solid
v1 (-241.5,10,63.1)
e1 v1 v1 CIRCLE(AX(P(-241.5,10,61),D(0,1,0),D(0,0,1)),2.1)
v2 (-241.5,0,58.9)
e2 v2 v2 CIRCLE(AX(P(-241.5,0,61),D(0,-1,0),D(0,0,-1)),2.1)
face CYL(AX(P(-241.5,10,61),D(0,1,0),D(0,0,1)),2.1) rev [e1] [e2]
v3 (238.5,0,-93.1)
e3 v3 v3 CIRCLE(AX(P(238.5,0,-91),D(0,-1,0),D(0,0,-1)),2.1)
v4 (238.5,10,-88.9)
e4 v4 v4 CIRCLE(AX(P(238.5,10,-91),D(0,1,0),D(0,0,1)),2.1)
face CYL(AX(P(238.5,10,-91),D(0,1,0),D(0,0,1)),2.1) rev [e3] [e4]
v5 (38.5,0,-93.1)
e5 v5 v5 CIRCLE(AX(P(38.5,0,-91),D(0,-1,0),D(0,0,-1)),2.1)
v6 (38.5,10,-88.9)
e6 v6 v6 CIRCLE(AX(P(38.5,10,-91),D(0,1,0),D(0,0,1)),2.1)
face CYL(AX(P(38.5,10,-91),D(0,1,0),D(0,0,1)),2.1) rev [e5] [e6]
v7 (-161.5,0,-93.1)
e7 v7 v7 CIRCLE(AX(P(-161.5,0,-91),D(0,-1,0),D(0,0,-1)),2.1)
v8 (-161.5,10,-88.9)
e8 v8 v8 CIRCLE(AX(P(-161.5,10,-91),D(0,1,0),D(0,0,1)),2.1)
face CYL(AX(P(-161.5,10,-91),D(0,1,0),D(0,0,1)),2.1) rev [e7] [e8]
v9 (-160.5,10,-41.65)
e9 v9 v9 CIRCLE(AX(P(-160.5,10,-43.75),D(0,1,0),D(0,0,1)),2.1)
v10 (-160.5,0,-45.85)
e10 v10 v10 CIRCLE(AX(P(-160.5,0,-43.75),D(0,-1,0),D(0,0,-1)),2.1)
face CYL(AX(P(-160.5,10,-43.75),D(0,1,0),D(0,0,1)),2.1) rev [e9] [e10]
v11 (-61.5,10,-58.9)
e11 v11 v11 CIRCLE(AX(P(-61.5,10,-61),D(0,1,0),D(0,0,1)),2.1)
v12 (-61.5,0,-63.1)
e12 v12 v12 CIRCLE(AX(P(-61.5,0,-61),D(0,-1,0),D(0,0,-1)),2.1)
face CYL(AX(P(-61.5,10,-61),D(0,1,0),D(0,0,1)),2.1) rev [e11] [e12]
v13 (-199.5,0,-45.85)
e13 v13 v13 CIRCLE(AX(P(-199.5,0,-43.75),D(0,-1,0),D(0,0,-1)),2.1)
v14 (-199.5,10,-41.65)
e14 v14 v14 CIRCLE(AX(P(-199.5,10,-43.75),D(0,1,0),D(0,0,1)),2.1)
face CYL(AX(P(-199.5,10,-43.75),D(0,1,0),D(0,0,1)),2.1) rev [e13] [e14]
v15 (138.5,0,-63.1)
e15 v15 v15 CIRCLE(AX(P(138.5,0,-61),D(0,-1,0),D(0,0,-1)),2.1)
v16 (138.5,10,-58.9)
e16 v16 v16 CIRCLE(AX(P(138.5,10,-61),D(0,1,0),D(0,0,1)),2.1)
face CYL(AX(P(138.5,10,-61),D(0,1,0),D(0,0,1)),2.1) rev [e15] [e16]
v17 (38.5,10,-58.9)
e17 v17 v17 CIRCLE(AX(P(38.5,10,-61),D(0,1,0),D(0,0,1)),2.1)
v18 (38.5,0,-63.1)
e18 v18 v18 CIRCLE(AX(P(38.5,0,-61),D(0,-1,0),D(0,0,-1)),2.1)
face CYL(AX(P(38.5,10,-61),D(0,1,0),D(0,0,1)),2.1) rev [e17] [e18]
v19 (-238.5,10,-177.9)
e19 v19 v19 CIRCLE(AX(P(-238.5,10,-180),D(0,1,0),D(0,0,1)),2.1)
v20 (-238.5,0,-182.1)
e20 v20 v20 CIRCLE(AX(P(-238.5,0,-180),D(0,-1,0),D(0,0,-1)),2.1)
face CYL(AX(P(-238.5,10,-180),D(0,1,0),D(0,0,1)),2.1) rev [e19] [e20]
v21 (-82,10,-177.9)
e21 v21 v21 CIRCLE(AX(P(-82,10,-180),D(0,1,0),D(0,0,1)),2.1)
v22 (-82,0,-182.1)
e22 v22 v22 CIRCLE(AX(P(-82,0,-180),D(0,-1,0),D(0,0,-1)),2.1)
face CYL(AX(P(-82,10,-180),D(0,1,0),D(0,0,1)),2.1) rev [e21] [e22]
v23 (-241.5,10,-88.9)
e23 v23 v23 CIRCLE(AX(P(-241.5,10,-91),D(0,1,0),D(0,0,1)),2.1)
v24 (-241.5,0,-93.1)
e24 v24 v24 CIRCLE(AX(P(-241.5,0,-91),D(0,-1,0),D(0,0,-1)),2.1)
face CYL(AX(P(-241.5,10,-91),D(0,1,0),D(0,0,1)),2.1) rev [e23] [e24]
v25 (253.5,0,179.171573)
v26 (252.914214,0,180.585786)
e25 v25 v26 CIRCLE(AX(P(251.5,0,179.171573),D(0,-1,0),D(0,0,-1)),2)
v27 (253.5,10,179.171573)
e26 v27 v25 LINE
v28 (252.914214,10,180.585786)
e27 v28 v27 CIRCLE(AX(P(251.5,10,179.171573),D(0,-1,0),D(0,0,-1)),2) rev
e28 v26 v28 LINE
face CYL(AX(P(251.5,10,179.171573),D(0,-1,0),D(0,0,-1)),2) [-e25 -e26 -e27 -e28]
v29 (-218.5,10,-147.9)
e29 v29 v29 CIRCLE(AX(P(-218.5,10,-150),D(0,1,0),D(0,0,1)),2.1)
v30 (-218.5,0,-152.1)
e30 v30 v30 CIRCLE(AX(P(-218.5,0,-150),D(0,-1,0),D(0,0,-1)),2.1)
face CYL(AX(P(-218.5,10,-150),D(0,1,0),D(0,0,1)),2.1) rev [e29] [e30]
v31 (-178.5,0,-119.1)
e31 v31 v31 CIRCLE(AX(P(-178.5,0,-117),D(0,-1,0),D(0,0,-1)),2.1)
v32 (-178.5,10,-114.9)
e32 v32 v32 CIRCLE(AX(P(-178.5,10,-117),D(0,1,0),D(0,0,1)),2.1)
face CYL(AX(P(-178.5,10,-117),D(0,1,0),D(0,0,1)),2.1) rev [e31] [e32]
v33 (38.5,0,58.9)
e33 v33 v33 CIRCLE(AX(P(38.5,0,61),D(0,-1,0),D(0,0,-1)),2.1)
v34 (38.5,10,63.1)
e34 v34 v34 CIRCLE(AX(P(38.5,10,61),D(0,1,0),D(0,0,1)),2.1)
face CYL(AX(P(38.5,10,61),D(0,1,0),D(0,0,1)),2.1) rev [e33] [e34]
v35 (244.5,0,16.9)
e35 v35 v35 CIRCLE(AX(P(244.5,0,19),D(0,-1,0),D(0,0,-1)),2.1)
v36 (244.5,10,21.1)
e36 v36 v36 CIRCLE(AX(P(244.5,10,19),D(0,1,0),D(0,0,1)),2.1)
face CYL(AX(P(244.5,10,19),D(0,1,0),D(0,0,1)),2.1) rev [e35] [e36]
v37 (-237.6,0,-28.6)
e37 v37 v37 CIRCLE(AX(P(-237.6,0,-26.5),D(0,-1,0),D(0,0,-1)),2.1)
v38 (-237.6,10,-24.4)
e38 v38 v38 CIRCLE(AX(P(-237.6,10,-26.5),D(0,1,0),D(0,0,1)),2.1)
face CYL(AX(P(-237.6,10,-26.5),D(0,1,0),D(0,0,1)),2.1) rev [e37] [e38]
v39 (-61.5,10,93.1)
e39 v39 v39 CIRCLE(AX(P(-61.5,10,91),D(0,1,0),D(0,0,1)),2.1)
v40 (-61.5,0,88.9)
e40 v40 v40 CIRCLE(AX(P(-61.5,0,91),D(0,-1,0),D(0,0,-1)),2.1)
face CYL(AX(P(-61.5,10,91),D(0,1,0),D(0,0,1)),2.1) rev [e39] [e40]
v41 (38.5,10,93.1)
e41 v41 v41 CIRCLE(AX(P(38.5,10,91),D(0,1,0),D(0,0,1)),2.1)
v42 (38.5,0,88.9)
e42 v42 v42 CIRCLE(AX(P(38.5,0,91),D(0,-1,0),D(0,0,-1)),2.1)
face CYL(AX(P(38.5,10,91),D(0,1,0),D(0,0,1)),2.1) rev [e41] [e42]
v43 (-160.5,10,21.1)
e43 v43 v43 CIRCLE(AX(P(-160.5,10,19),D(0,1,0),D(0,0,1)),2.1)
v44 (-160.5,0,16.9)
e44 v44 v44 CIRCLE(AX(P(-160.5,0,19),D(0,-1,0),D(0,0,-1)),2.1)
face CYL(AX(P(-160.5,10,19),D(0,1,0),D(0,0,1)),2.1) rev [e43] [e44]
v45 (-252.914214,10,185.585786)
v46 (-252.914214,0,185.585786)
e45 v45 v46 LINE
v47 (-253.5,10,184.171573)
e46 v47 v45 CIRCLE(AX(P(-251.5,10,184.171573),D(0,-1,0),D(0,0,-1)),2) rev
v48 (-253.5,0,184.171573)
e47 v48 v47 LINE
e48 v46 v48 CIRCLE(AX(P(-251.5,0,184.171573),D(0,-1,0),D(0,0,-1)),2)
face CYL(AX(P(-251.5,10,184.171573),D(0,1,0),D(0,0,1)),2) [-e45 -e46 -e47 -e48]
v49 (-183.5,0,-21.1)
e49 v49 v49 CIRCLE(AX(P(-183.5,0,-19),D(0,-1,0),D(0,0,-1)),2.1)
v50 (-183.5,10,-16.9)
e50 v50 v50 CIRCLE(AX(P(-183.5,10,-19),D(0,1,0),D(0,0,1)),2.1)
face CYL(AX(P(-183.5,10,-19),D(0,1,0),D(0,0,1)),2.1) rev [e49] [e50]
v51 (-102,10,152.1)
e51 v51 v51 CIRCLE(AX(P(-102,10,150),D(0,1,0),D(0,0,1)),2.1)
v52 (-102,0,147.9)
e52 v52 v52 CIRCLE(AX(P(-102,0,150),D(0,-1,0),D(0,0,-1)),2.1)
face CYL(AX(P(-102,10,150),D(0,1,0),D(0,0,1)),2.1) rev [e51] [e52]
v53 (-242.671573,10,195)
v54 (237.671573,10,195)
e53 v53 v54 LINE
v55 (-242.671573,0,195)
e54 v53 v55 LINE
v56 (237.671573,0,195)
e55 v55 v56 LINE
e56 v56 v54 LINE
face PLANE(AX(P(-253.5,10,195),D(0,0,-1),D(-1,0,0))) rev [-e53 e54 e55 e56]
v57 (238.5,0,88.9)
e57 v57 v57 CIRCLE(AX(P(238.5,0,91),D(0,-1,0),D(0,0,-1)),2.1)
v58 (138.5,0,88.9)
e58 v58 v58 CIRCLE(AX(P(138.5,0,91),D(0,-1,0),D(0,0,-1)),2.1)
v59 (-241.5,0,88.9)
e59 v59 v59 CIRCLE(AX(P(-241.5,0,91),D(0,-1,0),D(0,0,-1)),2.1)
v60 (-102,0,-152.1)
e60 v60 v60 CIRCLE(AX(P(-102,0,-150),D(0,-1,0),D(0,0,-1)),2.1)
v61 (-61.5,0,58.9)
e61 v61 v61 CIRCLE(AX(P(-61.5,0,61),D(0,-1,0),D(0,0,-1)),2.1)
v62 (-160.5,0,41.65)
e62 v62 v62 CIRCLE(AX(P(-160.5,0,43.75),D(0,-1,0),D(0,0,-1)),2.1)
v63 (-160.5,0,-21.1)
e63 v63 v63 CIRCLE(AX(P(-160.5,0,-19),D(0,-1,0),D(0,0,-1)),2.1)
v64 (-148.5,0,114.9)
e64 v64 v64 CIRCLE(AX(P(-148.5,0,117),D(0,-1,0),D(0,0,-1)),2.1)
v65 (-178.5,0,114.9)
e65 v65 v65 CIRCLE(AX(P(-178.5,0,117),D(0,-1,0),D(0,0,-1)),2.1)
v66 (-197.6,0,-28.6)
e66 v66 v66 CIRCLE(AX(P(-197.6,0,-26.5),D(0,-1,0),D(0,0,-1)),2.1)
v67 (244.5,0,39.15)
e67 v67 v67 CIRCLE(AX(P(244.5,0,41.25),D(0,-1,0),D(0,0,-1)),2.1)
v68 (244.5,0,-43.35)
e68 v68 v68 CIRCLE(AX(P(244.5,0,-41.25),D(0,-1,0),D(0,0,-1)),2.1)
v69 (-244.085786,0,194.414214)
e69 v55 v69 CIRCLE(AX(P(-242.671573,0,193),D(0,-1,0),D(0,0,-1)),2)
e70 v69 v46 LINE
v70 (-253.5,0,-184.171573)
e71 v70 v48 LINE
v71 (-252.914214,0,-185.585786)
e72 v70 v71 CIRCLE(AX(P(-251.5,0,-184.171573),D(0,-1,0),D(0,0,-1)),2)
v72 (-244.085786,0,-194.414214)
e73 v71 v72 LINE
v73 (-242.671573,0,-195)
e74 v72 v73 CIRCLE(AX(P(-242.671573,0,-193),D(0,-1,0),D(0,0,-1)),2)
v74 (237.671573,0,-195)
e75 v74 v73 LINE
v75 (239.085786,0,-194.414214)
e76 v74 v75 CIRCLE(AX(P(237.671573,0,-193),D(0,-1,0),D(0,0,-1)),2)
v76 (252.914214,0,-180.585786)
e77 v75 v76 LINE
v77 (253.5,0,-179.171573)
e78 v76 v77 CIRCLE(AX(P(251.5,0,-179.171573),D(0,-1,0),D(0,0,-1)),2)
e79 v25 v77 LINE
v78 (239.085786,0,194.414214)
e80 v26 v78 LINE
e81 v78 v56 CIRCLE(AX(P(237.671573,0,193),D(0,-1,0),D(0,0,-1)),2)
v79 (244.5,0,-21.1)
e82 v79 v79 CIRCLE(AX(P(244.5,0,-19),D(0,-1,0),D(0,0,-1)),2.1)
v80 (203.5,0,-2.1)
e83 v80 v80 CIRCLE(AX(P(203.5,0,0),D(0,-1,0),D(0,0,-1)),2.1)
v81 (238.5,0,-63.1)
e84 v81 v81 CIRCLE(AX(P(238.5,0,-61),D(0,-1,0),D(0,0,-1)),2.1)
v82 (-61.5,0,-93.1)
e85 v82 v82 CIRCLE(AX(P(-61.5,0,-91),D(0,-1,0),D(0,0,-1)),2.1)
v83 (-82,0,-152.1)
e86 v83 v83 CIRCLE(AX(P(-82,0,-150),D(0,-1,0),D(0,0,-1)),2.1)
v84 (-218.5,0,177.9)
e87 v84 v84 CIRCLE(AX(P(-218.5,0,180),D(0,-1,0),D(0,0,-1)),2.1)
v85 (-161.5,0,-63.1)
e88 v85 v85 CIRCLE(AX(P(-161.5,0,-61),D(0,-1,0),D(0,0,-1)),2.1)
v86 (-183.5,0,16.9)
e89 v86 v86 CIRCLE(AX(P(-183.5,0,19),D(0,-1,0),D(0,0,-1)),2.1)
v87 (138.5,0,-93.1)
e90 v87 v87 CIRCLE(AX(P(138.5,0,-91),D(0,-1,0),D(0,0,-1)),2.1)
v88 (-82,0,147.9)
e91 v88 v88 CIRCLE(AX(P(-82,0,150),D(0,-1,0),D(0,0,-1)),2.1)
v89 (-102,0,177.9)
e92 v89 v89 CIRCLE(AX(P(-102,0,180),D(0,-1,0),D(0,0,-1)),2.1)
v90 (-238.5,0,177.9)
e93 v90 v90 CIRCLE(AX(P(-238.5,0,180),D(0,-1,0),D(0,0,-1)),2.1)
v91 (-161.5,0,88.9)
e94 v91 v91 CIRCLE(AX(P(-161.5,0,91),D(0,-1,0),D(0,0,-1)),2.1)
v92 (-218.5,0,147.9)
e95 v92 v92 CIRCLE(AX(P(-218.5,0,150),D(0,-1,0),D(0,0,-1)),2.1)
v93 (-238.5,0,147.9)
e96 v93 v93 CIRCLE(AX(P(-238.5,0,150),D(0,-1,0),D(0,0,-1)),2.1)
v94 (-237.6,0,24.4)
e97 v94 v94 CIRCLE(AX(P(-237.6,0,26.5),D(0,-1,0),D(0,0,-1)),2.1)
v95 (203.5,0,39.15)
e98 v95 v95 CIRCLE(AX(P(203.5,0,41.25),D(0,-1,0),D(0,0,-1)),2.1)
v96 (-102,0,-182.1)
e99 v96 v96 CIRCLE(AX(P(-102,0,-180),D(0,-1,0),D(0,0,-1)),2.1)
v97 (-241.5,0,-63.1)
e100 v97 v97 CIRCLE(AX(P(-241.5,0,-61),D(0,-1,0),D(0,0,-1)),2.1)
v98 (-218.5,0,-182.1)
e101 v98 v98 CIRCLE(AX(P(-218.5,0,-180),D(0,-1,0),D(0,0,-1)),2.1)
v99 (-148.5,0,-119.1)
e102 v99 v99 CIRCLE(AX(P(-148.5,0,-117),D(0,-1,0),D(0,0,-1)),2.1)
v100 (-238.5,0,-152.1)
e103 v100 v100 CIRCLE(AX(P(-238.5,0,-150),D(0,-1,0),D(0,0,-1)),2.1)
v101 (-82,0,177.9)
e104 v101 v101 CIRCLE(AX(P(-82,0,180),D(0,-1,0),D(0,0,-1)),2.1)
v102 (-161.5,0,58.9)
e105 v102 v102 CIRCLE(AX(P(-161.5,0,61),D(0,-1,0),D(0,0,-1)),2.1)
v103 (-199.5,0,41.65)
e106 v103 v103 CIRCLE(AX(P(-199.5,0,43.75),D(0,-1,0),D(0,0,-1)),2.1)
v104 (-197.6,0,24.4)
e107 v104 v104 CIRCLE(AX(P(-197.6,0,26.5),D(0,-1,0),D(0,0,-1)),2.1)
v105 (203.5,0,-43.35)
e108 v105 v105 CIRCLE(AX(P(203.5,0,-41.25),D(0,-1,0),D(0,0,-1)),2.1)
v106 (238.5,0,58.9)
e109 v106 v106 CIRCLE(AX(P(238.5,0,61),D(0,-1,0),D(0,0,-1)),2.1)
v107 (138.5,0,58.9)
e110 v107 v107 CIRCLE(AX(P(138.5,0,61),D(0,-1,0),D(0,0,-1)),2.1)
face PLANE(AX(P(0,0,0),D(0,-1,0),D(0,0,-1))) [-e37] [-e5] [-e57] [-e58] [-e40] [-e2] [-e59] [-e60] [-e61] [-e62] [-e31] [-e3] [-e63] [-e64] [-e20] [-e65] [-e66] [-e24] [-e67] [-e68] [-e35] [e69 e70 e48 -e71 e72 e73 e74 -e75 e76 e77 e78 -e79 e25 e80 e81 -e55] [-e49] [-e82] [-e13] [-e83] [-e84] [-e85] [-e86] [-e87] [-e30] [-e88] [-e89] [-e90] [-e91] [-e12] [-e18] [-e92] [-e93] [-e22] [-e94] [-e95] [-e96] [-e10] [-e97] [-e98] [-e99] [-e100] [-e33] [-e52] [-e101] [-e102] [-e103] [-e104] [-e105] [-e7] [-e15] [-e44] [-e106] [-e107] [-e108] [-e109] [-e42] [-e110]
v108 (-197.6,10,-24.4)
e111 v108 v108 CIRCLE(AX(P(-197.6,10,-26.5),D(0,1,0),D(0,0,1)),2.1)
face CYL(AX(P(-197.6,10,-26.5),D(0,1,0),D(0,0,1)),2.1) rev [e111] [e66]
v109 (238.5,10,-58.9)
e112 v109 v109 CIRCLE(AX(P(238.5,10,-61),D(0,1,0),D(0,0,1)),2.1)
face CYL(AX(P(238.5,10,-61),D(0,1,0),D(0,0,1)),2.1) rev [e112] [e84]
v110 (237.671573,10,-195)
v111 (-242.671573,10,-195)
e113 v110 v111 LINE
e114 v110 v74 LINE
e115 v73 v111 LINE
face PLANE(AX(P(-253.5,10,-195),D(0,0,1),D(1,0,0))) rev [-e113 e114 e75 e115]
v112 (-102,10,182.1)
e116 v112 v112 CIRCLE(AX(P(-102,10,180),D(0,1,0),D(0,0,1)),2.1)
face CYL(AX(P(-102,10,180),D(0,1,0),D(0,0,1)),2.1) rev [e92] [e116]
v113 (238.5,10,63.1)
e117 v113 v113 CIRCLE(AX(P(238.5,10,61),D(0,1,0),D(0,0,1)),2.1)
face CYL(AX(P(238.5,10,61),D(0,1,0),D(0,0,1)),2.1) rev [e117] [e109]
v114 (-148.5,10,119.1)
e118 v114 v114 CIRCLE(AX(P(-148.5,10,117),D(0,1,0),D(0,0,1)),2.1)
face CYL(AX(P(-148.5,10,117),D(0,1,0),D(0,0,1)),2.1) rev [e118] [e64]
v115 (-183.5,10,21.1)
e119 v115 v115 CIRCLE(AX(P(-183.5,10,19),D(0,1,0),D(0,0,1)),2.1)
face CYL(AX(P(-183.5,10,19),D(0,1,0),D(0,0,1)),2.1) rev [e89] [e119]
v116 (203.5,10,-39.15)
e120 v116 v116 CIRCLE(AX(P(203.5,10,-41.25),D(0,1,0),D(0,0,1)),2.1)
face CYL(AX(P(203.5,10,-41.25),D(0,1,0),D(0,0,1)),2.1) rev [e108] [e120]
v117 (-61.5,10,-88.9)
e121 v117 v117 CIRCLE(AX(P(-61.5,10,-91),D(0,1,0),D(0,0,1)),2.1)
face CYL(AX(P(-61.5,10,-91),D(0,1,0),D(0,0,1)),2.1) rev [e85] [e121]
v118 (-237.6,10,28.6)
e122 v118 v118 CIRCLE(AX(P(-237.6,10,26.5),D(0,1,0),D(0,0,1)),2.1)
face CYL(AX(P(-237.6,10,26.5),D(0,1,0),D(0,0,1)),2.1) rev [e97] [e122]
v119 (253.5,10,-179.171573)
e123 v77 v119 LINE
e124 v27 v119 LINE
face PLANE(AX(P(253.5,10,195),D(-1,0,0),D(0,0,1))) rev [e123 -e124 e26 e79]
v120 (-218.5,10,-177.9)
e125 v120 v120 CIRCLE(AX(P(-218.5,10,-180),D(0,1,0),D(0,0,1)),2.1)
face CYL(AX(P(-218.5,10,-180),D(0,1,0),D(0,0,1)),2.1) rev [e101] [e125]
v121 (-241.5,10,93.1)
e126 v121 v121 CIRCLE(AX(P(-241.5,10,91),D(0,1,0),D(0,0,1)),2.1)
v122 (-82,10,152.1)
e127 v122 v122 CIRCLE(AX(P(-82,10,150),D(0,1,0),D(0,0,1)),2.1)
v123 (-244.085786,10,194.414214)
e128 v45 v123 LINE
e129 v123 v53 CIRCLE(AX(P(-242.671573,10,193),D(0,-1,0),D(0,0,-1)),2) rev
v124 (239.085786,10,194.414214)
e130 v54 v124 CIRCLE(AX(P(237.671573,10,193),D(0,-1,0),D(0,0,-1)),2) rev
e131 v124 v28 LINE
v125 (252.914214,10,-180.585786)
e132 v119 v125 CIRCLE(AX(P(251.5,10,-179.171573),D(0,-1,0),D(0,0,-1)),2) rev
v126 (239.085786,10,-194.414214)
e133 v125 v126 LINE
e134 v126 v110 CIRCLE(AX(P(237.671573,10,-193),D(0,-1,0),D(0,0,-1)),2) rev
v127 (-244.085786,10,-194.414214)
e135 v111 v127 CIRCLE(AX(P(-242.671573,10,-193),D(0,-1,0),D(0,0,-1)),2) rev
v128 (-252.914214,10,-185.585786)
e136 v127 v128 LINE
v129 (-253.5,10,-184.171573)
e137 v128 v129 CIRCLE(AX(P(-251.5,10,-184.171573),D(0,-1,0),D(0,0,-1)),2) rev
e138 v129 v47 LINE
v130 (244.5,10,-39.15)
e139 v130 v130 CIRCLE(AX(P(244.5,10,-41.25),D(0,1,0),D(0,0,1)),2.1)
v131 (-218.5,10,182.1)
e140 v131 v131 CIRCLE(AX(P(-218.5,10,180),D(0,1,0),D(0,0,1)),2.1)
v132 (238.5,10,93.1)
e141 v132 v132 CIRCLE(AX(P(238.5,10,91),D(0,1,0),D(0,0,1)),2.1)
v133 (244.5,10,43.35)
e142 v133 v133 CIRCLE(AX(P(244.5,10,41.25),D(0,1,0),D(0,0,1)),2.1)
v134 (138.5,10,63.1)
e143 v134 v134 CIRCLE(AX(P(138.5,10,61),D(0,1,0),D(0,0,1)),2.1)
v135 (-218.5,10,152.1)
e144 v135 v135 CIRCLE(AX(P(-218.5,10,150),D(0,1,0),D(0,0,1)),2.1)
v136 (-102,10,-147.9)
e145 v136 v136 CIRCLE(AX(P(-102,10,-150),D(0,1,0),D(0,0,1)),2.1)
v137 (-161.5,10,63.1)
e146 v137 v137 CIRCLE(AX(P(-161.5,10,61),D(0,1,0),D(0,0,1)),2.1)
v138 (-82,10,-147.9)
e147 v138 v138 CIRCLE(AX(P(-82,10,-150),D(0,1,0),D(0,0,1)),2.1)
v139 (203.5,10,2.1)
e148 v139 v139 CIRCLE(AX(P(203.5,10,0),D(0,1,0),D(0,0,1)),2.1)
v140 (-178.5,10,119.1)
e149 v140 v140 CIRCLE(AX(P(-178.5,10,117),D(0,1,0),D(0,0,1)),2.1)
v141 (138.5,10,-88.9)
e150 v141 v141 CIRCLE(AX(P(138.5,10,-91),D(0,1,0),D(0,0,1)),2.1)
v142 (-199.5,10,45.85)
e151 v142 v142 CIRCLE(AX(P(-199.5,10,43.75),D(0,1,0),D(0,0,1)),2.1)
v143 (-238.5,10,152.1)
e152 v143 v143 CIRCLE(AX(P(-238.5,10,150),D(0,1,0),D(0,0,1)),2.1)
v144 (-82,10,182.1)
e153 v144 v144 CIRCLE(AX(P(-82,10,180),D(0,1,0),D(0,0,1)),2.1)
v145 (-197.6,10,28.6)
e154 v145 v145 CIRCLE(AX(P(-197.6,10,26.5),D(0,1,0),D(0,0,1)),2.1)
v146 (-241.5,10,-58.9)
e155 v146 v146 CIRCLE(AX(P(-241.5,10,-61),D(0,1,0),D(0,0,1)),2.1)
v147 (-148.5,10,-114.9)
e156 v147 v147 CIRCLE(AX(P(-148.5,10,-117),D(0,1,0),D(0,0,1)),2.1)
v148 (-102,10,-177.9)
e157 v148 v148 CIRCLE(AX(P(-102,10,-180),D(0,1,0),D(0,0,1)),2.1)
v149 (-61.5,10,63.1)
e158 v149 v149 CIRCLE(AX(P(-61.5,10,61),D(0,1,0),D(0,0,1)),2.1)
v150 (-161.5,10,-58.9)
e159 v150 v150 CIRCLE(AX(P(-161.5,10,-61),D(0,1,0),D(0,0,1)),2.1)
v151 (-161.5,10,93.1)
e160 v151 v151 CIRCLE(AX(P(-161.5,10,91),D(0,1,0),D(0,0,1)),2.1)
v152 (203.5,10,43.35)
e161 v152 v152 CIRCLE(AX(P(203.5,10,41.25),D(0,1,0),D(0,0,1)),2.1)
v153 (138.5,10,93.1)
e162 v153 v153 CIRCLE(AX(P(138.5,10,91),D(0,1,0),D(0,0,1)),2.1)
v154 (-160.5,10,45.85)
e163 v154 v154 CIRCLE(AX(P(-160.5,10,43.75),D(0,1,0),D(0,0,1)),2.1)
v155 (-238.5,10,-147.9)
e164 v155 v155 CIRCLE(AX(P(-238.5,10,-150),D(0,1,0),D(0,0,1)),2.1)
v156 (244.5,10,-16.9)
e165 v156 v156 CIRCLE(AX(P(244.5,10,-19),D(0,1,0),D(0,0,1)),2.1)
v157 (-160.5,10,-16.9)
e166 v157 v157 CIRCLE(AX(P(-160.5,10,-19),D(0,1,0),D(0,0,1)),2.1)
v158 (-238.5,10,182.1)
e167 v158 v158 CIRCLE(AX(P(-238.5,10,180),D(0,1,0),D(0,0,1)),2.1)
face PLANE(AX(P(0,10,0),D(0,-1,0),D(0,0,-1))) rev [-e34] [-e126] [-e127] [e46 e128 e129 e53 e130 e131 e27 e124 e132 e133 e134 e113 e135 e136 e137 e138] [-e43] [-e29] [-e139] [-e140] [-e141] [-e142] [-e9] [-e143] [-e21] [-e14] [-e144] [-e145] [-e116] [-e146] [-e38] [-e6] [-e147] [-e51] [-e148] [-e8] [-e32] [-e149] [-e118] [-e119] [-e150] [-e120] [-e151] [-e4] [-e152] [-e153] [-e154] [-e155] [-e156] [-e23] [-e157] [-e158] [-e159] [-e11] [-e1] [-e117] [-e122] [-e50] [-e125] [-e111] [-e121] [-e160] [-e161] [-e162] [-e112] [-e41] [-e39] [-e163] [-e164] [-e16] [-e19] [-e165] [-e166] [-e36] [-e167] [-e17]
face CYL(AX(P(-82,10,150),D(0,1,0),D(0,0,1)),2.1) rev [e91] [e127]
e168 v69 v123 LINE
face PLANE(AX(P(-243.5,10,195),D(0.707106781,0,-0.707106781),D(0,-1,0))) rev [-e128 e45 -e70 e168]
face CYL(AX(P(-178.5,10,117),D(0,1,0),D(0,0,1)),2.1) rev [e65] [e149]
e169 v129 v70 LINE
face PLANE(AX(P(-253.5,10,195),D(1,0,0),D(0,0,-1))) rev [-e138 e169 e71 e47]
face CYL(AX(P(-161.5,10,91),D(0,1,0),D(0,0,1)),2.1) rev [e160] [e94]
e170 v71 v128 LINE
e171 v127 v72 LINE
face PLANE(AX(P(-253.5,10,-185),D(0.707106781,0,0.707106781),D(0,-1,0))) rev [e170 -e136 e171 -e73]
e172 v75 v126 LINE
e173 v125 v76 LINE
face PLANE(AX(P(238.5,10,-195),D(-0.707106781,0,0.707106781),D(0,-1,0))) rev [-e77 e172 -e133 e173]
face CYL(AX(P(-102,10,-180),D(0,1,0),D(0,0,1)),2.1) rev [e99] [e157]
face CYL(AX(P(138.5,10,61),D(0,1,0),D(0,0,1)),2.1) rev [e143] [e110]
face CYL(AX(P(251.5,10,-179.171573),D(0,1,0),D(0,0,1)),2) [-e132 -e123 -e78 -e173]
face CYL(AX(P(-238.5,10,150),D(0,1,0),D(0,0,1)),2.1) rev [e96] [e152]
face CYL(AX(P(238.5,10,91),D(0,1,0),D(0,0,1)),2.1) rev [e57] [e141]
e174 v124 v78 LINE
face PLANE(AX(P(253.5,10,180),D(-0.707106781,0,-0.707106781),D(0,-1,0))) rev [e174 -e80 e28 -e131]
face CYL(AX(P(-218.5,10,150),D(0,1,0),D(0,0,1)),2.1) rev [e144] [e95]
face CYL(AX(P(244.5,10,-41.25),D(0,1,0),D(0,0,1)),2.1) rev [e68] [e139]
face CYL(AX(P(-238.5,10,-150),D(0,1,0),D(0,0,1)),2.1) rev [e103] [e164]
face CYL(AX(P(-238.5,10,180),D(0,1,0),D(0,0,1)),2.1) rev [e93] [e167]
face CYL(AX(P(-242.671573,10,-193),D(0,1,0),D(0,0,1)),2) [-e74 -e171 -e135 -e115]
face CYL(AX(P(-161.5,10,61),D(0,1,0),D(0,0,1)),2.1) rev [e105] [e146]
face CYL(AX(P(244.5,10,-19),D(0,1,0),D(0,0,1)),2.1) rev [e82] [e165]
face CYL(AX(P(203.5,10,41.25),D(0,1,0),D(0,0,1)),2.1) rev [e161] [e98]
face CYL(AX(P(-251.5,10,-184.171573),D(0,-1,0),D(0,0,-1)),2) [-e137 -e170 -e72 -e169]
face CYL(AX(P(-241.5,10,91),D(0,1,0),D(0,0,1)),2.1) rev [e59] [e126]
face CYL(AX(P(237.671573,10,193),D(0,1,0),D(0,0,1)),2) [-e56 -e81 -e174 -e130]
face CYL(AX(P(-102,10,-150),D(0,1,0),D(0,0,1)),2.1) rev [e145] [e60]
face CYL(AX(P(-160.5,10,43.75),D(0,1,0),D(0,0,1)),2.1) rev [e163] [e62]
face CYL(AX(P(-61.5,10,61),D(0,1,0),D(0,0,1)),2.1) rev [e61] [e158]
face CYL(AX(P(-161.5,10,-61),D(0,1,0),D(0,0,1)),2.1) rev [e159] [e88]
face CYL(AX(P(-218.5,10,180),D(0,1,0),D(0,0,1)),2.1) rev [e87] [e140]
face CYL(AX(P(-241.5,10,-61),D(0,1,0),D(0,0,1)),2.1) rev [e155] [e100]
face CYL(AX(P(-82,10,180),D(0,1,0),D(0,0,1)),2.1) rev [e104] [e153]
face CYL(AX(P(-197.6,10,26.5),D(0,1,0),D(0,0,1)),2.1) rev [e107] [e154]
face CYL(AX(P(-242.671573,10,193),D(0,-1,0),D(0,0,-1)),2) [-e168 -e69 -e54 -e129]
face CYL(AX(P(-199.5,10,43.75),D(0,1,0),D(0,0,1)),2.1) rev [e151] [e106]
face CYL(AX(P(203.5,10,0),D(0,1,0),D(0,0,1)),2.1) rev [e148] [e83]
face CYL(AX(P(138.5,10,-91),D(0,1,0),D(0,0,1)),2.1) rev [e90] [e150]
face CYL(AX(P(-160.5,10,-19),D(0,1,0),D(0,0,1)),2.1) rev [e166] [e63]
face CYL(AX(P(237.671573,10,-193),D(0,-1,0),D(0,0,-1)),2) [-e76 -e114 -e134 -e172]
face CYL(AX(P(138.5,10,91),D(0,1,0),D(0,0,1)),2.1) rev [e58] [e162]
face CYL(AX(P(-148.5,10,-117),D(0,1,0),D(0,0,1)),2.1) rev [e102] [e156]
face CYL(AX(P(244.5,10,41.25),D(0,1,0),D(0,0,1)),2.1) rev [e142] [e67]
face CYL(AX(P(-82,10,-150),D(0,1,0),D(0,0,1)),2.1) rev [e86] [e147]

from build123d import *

# Parameters (mm, degrees)
SKETCH1_W                 = 507
SKETCH1_H                 = 390
BOSS_EXTRUDE1_DEPTH       = 10
CHAMFER1_SIZE             = 15
CHAMFER2_SIZE             = 10
FILLET1_R                 = 2
M5_TAPPED_HOLE1_OUTLINE_R = 2.1
M5_TAPPED_HOLE1_DEPTH     = 10


# Read off the part's stored shape, not the designer's step: M5 Tapped Hole1
with BuildPart() as part:
    # Sketch1 → Boss-Extrude1 (new body)
    with BuildSketch(Plane(origin=(0, 0, 0), x_dir=(1, 0, 0), z_dir=(0, 1, 0))):
        Rectangle(SKETCH1_W, SKETCH1_H)
    extrude(amount=BOSS_EXTRUDE1_DEPTH)

    # Chamfer1
    chamfer1_edges = [part.edges().sort_by_distance(p)[0] for p in [
        (253.5, 5, 195),
        (253.5, 5, -195),
    ]]
    chamfer(chamfer1_edges, length=CHAMFER1_SIZE)

    # Chamfer2
    chamfer2_edges = [part.edges().sort_by_distance(p)[0] for p in [
        (-253.5, 5, 195),
        (-253.5, 5, -195),
    ]]
    chamfer(chamfer2_edges, length=CHAMFER2_SIZE)

    # Fillet1
    fillet1_edges = [part.edges().sort_by_distance(p)[0] for p in [
        (238.5, 5, -195),
        (253.5, 5, 180),
        (253.5, 5, -180),
        (238.5, 5, 195),
        (-253.5, 5, 185),
        (-253.5, 5, -185),
        (-243.5, 5, -195),
        (-243.5, 5, 195),
    ]]
    fillet(fillet1_edges, radius=FILLET1_R)

    # M5 Tapped Hole1 outline → M5 Tapped Hole1 (cut)
    with BuildSketch(Plane(origin=(0, 0, 0), x_dir=(1, 0, 0), z_dir=(0, 1, 0))):
        with Locations((203.5, -41.25)):
            Circle(M5_TAPPED_HOLE1_OUTLINE_R)
        with Locations((203.5, 41.25)):
            Circle(M5_TAPPED_HOLE1_OUTLINE_R)
        with Locations((-197.6, 26.5)):
            Circle(M5_TAPPED_HOLE1_OUTLINE_R)
        with Locations((-237.6, 26.5)):
            Circle(M5_TAPPED_HOLE1_OUTLINE_R)
        with Locations((-197.6, -26.5)):
            Circle(M5_TAPPED_HOLE1_OUTLINE_R)
        with Locations((-237.6, -26.5)):
            Circle(M5_TAPPED_HOLE1_OUTLINE_R)
        with Locations((-199.5, -43.75)):
            Circle(M5_TAPPED_HOLE1_OUTLINE_R)
        with Locations((-199.5, 43.75)):
            Circle(M5_TAPPED_HOLE1_OUTLINE_R)
        with Locations((-160.5, -43.75)):
            Circle(M5_TAPPED_HOLE1_OUTLINE_R)
        with Locations((-160.5, 43.75)):
            Circle(M5_TAPPED_HOLE1_OUTLINE_R)
        with Locations((-160.5, 19)):
            Circle(M5_TAPPED_HOLE1_OUTLINE_R)
        with Locations((-183.5, 19)):
            Circle(M5_TAPPED_HOLE1_OUTLINE_R)
        with Locations((-160.5, -19)):
            Circle(M5_TAPPED_HOLE1_OUTLINE_R)
        with Locations((-183.5, -19)):
            Circle(M5_TAPPED_HOLE1_OUTLINE_R)
        with Locations((244.5, 41.25)):
            Circle(M5_TAPPED_HOLE1_OUTLINE_R)
        with Locations((244.5, 19)):
            Circle(M5_TAPPED_HOLE1_OUTLINE_R)
        with Locations((244.5, -19)):
            Circle(M5_TAPPED_HOLE1_OUTLINE_R)
        with Locations((244.5, -41.25)):
            Circle(M5_TAPPED_HOLE1_OUTLINE_R)
        with Locations((203.5, 0)):
            Circle(M5_TAPPED_HOLE1_OUTLINE_R)
        with Locations((238.5, -91)):
            Circle(M5_TAPPED_HOLE1_OUTLINE_R)
        with Locations((238.5, -61)):
            Circle(M5_TAPPED_HOLE1_OUTLINE_R)
        with Locations((138.5, -91)):
            Circle(M5_TAPPED_HOLE1_OUTLINE_R)
        with Locations((138.5, -61)):
            Circle(M5_TAPPED_HOLE1_OUTLINE_R)
        with Locations((38.5, -91)):
            Circle(M5_TAPPED_HOLE1_OUTLINE_R)
        with Locations((38.5, -61)):
            Circle(M5_TAPPED_HOLE1_OUTLINE_R)
        with Locations((-61.5, -91)):
            Circle(M5_TAPPED_HOLE1_OUTLINE_R)
        with Locations((-61.5, -61)):
            Circle(M5_TAPPED_HOLE1_OUTLINE_R)
        with Locations((-161.5, -61)):
            Circle(M5_TAPPED_HOLE1_OUTLINE_R)
        with Locations((-161.5, -91)):
            Circle(M5_TAPPED_HOLE1_OUTLINE_R)
        with Locations((-241.5, -91)):
            Circle(M5_TAPPED_HOLE1_OUTLINE_R)
        with Locations((-241.5, -61)):
            Circle(M5_TAPPED_HOLE1_OUTLINE_R)
        with Locations((238.5, 61)):
            Circle(M5_TAPPED_HOLE1_OUTLINE_R)
        with Locations((238.5, 91)):
            Circle(M5_TAPPED_HOLE1_OUTLINE_R)
        with Locations((138.5, 61)):
            Circle(M5_TAPPED_HOLE1_OUTLINE_R)
        with Locations((138.5, 91)):
            Circle(M5_TAPPED_HOLE1_OUTLINE_R)
        with Locations((38.5, 61)):
            Circle(M5_TAPPED_HOLE1_OUTLINE_R)
        with Locations((38.5, 91)):
            Circle(M5_TAPPED_HOLE1_OUTLINE_R)
        with Locations((-61.5, 61)):
            Circle(M5_TAPPED_HOLE1_OUTLINE_R)
        with Locations((-61.5, 91)):
            Circle(M5_TAPPED_HOLE1_OUTLINE_R)
        with Locations((-161.5, 91)):
            Circle(M5_TAPPED_HOLE1_OUTLINE_R)
        with Locations((-161.5, 61)):
            Circle(M5_TAPPED_HOLE1_OUTLINE_R)
        with Locations((-241.5, 91)):
            Circle(M5_TAPPED_HOLE1_OUTLINE_R)
        with Locations((-241.5, 61)):
            Circle(M5_TAPPED_HOLE1_OUTLINE_R)
        with Locations((-82, -180)):
            Circle(M5_TAPPED_HOLE1_OUTLINE_R)
        with Locations((-102, -180)):
            Circle(M5_TAPPED_HOLE1_OUTLINE_R)
        with Locations((-82, -150)):
            Circle(M5_TAPPED_HOLE1_OUTLINE_R)
        with Locations((-102, -150)):
            Circle(M5_TAPPED_HOLE1_OUTLINE_R)
        with Locations((-218.5, -180)):
            Circle(M5_TAPPED_HOLE1_OUTLINE_R)
        with Locations((-238.5, -180)):
            Circle(M5_TAPPED_HOLE1_OUTLINE_R)
        with Locations((-218.5, -150)):
            Circle(M5_TAPPED_HOLE1_OUTLINE_R)
        with Locations((-238.5, -150)):
            Circle(M5_TAPPED_HOLE1_OUTLINE_R)
        with Locations((-148.5, -117)):
            Circle(M5_TAPPED_HOLE1_OUTLINE_R)
        with Locations((-178.5, -117)):
            Circle(M5_TAPPED_HOLE1_OUTLINE_R)
        with Locations((-148.5, 117)):
            Circle(M5_TAPPED_HOLE1_OUTLINE_R)
        with Locations((-178.5, 117)):
            Circle(M5_TAPPED_HOLE1_OUTLINE_R)
        with Locations((-82, 150)):
            Circle(M5_TAPPED_HOLE1_OUTLINE_R)
        with Locations((-102, 150)):
            Circle(M5_TAPPED_HOLE1_OUTLINE_R)
        with Locations((-82, 180)):
            Circle(M5_TAPPED_HOLE1_OUTLINE_R)
        with Locations((-102, 180)):
            Circle(M5_TAPPED_HOLE1_OUTLINE_R)
        with Locations((-218.5, 150)):
            Circle(M5_TAPPED_HOLE1_OUTLINE_R)
        with Locations((-238.5, 150)):
            Circle(M5_TAPPED_HOLE1_OUTLINE_R)
        with Locations((-218.5, 180)):
            Circle(M5_TAPPED_HOLE1_OUTLINE_R)
        with Locations((-238.5, 180)):
            Circle(M5_TAPPED_HOLE1_OUTLINE_R)
    extrude(amount=M5_TAPPED_HOLE1_DEPTH, mode=Mode.SUBTRACT)


solid = part.part
